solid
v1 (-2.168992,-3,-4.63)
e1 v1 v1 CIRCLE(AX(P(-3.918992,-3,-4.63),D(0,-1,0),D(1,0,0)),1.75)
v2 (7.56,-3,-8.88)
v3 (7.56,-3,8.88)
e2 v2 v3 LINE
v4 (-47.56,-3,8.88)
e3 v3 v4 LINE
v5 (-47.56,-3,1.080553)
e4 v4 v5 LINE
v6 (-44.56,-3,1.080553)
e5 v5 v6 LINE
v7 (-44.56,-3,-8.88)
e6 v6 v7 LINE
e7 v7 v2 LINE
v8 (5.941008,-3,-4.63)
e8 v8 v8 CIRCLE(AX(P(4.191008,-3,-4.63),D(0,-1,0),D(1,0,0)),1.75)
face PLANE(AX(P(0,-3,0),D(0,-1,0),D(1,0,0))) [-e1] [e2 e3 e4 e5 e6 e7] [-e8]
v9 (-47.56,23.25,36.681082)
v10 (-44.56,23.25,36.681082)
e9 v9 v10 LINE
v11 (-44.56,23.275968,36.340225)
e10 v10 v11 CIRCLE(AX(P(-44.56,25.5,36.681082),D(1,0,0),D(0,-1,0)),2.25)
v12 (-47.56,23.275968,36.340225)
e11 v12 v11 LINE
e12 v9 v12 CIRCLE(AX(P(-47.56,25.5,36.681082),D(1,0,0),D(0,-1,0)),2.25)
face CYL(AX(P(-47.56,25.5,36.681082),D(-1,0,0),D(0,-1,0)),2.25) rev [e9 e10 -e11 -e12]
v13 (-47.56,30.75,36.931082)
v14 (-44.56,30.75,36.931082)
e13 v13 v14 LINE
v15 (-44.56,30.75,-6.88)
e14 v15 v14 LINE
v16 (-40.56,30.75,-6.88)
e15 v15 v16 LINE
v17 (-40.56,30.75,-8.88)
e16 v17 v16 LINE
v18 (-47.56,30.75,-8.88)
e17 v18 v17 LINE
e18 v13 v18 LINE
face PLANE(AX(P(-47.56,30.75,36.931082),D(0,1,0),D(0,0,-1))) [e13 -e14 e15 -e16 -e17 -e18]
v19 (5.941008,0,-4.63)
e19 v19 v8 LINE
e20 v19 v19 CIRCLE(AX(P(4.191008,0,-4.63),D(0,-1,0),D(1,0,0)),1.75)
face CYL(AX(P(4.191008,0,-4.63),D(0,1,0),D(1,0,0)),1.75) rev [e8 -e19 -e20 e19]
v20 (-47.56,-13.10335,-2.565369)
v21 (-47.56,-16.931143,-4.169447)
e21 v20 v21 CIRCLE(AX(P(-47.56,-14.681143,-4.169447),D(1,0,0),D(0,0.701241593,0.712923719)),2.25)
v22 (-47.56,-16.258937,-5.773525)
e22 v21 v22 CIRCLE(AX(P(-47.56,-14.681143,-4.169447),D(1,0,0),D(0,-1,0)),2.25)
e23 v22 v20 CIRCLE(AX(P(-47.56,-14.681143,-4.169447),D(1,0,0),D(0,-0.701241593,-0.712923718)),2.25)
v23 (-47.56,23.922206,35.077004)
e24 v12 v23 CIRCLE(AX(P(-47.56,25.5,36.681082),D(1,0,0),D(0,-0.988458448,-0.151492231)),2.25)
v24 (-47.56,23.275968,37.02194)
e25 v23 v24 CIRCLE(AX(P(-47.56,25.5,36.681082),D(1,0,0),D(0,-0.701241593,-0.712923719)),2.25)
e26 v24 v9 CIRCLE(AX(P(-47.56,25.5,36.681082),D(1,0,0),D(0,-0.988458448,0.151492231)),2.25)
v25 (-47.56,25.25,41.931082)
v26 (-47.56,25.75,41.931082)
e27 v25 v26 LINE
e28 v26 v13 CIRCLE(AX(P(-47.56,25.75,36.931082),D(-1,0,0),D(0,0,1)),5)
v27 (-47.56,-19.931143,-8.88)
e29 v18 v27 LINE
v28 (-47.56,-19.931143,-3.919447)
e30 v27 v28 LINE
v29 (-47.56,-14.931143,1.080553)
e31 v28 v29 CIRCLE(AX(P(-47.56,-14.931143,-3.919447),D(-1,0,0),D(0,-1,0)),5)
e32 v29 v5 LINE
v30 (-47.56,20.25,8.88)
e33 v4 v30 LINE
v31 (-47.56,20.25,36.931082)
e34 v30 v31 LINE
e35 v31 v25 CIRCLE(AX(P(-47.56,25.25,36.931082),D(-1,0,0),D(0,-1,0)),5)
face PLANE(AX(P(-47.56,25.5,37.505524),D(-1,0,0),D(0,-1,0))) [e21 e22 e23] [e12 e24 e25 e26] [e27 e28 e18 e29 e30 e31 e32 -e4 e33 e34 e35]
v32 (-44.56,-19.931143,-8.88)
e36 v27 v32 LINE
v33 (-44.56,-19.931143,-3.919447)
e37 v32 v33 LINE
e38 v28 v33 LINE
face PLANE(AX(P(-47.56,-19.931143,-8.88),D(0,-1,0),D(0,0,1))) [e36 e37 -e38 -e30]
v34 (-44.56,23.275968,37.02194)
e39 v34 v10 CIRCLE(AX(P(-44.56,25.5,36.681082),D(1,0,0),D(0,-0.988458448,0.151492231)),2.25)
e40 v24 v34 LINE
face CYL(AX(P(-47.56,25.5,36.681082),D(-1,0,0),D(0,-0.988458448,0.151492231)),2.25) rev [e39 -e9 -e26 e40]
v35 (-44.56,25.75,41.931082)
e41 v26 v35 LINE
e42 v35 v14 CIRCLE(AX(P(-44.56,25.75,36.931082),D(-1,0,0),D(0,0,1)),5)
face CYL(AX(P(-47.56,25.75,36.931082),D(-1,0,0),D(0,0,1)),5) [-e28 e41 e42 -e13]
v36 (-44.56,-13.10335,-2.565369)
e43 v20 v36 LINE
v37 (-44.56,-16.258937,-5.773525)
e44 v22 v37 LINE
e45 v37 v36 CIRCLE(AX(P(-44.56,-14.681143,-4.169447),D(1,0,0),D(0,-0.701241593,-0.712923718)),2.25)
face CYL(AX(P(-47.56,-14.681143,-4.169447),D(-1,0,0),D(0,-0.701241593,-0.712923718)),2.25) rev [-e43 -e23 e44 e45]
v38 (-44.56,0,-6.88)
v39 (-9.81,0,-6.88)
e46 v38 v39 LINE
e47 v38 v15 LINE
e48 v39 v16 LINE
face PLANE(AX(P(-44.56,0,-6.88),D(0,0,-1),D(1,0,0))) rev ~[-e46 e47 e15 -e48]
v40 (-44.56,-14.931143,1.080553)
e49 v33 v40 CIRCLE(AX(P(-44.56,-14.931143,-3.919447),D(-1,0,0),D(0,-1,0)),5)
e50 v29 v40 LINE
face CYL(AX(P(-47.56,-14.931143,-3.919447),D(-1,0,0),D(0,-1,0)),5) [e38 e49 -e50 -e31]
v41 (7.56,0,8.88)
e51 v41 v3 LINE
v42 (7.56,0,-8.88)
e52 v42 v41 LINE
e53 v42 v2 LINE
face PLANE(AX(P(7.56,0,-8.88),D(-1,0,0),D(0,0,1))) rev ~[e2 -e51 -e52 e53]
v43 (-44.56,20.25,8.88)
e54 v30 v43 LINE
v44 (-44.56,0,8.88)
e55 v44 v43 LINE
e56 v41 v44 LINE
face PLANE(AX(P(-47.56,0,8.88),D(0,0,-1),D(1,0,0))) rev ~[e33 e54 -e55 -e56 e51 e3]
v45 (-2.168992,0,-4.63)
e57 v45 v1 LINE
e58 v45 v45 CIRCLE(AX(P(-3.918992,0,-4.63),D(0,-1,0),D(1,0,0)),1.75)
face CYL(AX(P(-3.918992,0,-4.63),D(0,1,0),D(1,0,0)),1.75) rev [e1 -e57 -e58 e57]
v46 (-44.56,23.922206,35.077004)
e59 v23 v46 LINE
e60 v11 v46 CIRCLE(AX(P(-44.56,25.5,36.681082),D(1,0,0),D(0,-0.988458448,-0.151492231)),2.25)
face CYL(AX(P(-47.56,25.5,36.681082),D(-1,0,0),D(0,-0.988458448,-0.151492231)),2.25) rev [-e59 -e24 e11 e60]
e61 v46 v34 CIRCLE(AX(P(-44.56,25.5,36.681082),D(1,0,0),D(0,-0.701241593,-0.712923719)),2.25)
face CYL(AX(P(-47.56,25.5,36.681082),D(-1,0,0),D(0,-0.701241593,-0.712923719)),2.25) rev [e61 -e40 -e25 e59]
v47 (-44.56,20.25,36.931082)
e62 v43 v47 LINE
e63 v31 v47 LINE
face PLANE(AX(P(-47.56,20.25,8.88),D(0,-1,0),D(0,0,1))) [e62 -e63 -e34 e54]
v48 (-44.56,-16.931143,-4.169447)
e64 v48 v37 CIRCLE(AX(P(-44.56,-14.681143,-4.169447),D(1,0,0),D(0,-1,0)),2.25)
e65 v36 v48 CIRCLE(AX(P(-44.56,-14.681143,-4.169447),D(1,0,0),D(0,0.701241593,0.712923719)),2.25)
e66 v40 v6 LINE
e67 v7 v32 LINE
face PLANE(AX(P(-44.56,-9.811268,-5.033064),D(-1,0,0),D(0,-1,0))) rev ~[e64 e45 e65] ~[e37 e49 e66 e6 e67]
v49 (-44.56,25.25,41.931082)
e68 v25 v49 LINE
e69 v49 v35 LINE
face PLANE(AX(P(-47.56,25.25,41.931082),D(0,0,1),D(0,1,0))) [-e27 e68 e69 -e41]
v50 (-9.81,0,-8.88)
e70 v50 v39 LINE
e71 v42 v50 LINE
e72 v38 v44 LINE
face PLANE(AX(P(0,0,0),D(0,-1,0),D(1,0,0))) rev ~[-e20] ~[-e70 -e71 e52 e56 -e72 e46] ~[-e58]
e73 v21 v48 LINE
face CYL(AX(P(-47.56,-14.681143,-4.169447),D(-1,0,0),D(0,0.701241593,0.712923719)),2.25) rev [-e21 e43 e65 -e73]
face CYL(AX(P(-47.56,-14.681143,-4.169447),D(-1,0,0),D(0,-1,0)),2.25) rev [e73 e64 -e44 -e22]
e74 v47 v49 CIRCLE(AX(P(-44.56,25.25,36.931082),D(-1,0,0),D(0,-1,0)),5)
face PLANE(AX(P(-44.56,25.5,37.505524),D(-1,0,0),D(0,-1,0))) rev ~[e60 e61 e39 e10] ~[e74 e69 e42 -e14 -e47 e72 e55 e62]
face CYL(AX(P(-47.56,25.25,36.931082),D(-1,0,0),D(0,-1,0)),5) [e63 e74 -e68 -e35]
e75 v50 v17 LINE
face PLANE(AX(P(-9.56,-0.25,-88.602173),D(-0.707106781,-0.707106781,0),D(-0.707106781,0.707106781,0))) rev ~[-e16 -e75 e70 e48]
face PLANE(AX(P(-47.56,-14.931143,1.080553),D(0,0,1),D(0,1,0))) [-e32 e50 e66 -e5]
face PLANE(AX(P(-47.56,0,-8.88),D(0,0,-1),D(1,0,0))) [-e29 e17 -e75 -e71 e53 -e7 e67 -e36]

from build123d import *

# Parameters (mm, degrees)
F0_W        = 15.12
F0_H        = 17.76
F0_R        = 1.75
F0_W_2      = 3
F0_H_2      = 15.76
F0_W_3      = 35
F0_H_3      = 2
F1_DEPTH    = 3
F2_DEPTH    = 30.75
F4_DEPTH    = 3
F5_T4_DEPTH = 161.4443452539


# Not quite as in the source:
# - a fillet or chamfer that OpenCascade refuses, or shapes differently, is made with other operations: its cross-section is extruded or revolved along the edge and cut away or added


with BuildPart() as f1:
    # F0 (on Front) → F1 (new body)
    with BuildSketch(Plane.XZ):
        Rectangle(F0_W, F0_H)
        with Locations((-3.9189920692, -4.63)):
            Circle(F0_R, mode=Mode.SUBTRACT)
        with Locations((4.1910079308, -4.63)):
            Circle(F0_R, mode=Mode.SUBTRACT)
        Polygon((-7.56, -8.88), (-7.56, 8.88), (-44.56, 8.88), (-44.56, -6.88), (-9.56, -6.88), (-9.56, -8.88), align=None)
        with Locations((-46.06, 1)):
            Rectangle(F0_W_2, F0_H_2)
        with Locations((-27.06, -7.88)):
            Rectangle(F0_W_3, F0_H_3)
        with Locations((-46.06, -7.88)):
            Rectangle(F0_W_2, F0_H_3)
    extrude(amount=F1_DEPTH)

    # F0 (on Front) → F2 (join)
    with BuildSketch(Plane.XZ):
        with Locations((-46.06, 1)):
            Rectangle(F0_W_2, F0_H_2)
        with Locations((-46.06, -7.88)):
            Rectangle(F0_W_2, F0_H_3)
        with Locations((-27.06, -7.88)):
            Rectangle(F0_W_3, F0_H_3)
    extrude(amount=-F2_DEPTH)

    # F3 (on face) → F4 (join)
    with BuildSketch(Plane(origin=(-47.56, 0, 0), x_dir=(0, -1, 0), z_dir=(-1, 0, 0))):
        with BuildLine():
            Line((-30.75, 36.9310820997), (-30.75, 34.42))
            Line((-30.75, 34.42), (-23.2759684913, 34.42))
            Line((-23.2759684913, 34.42), (-20.25, 34.42))
            Line((-20.25, 34.42), (-20.25, 36.9310820997))
            ThreePointArc((-20.25, 36.9310820997), (-21.7144660941, 40.4666160056), (-25.25, 41.9310820997))
            Line((-25.25, 41.9310820997), (-25.75, 41.9310820997))
            ThreePointArc((-25.75, 41.9310820997), (-29.2855339059, 40.4666160056), (-30.75, 36.9310820997))
        make_face()
        with BuildLine():
            Line((-23.2759684913, 36.3402245806), (-23.2759684913, 34.42))
            Line((-23.2759684913, 34.42), (-23.922206416, 35.0770037331))
            ThreePointArc((-23.922206416, 35.0770037331), (-27.6352195224, 37.3905449889), (-23.2759684913, 37.0219396188))
            ThreePointArc((-23.2759684913, 37.0219396188), (-23.2565015161, 36.852004751), (-23.25, 36.6810820997))
            ThreePointArc((-23.25, 36.6810820997), (-23.2565015161, 36.5101594484), (-23.2759684913, 36.3402245806))
        make_face(mode=Mode.SUBTRACT)
        Polygon((-30.75, 34.42), (-30.75, 8.88), (-20.25, 8.88), (-20.25, 31.3436212872), (-23.2759684913, 34.42), align=None)
        Polygon((-23.2759684913, 34.42), (-20.25, 31.3436212872), (-20.25, 34.42), align=None)
        with BuildLine():
            Line((3, 1.0805530297), (3, -8.88))
            Line((3, -8.88), (19.3145081394, -8.88))
            Line((19.3145081394, -8.88), (16.2589368567, -5.7735253369))
            ThreePointArc((16.2589368567, -5.7735253369), (13.0770649061, -5.7472405543), (13.1033496887, -2.5653686037))
            Line((13.1033496887, -2.5653686037), (9.517170933, 1.0805530297))
            Line((9.517170933, 1.0805530297), (3, 1.0805530297))
        make_face()
        with BuildLine():
            Line((16.2589368567, -5.7735253369), (19.3145081394, -8.88))
            Line((19.3145081394, -8.88), (19.9311432727, -8.88))
            Line((19.9311432727, -8.88), (19.9311432727, -3.9194469703))
            ThreePointArc((19.9311432727, -3.9194469703), (18.4666771787, -0.3839130644), (14.9311432727, 1.0805530297))
            Line((14.9311432727, 1.0805530297), (9.517170933, 1.0805530297))
            Line((9.517170933, 1.0805530297), (13.1033496887, -2.5653686037))
            ThreePointArc((13.1033496887, -2.5653686037), (15.5507594053, -2.0942920889), (16.9311432727, -4.1694469703))
            ThreePointArc((16.9311432727, -4.1694469703), (16.7562981542, -5.0390631029), (16.2589368567, -5.7735253369))
        make_face()
        with BuildLine():
            Line((-23.922206416, 35.0770037331), (-23.2759684913, 34.42))
            Line((-23.2759684913, 34.42), (-23.2759684913, 36.3402245806))
            ThreePointArc((-23.2759684913, 36.3402245806), (-23.4969023398, 35.6563383445), (-23.922206416, 35.0770037331))
        make_face()
    extrude(amount=-F4_DEPTH)

    # F5: chamfer of 31 on 1 edges, made by hand


with BuildPart() as f5_tool2:
    # F5_s3 → F5_t4 (new body)
    with BuildSketch(Plane.XY.offset(-88.6021726269)):
        Polygon((-9.56, -0.25), (-40.56, 30.75), (-9.56, 30.75), align=None)
    extrude(amount=F5_T4_DEPTH)

    split(bisect_by=Plane.XZ, keep=Keep.BOTTOM)


with BuildPart() as f1_1:
    add(f1.part)

    # F5_t1: cut F5_tool2
    add(f5_tool2.part, mode=Mode.SUBTRACT)


solid = f1_1.part
